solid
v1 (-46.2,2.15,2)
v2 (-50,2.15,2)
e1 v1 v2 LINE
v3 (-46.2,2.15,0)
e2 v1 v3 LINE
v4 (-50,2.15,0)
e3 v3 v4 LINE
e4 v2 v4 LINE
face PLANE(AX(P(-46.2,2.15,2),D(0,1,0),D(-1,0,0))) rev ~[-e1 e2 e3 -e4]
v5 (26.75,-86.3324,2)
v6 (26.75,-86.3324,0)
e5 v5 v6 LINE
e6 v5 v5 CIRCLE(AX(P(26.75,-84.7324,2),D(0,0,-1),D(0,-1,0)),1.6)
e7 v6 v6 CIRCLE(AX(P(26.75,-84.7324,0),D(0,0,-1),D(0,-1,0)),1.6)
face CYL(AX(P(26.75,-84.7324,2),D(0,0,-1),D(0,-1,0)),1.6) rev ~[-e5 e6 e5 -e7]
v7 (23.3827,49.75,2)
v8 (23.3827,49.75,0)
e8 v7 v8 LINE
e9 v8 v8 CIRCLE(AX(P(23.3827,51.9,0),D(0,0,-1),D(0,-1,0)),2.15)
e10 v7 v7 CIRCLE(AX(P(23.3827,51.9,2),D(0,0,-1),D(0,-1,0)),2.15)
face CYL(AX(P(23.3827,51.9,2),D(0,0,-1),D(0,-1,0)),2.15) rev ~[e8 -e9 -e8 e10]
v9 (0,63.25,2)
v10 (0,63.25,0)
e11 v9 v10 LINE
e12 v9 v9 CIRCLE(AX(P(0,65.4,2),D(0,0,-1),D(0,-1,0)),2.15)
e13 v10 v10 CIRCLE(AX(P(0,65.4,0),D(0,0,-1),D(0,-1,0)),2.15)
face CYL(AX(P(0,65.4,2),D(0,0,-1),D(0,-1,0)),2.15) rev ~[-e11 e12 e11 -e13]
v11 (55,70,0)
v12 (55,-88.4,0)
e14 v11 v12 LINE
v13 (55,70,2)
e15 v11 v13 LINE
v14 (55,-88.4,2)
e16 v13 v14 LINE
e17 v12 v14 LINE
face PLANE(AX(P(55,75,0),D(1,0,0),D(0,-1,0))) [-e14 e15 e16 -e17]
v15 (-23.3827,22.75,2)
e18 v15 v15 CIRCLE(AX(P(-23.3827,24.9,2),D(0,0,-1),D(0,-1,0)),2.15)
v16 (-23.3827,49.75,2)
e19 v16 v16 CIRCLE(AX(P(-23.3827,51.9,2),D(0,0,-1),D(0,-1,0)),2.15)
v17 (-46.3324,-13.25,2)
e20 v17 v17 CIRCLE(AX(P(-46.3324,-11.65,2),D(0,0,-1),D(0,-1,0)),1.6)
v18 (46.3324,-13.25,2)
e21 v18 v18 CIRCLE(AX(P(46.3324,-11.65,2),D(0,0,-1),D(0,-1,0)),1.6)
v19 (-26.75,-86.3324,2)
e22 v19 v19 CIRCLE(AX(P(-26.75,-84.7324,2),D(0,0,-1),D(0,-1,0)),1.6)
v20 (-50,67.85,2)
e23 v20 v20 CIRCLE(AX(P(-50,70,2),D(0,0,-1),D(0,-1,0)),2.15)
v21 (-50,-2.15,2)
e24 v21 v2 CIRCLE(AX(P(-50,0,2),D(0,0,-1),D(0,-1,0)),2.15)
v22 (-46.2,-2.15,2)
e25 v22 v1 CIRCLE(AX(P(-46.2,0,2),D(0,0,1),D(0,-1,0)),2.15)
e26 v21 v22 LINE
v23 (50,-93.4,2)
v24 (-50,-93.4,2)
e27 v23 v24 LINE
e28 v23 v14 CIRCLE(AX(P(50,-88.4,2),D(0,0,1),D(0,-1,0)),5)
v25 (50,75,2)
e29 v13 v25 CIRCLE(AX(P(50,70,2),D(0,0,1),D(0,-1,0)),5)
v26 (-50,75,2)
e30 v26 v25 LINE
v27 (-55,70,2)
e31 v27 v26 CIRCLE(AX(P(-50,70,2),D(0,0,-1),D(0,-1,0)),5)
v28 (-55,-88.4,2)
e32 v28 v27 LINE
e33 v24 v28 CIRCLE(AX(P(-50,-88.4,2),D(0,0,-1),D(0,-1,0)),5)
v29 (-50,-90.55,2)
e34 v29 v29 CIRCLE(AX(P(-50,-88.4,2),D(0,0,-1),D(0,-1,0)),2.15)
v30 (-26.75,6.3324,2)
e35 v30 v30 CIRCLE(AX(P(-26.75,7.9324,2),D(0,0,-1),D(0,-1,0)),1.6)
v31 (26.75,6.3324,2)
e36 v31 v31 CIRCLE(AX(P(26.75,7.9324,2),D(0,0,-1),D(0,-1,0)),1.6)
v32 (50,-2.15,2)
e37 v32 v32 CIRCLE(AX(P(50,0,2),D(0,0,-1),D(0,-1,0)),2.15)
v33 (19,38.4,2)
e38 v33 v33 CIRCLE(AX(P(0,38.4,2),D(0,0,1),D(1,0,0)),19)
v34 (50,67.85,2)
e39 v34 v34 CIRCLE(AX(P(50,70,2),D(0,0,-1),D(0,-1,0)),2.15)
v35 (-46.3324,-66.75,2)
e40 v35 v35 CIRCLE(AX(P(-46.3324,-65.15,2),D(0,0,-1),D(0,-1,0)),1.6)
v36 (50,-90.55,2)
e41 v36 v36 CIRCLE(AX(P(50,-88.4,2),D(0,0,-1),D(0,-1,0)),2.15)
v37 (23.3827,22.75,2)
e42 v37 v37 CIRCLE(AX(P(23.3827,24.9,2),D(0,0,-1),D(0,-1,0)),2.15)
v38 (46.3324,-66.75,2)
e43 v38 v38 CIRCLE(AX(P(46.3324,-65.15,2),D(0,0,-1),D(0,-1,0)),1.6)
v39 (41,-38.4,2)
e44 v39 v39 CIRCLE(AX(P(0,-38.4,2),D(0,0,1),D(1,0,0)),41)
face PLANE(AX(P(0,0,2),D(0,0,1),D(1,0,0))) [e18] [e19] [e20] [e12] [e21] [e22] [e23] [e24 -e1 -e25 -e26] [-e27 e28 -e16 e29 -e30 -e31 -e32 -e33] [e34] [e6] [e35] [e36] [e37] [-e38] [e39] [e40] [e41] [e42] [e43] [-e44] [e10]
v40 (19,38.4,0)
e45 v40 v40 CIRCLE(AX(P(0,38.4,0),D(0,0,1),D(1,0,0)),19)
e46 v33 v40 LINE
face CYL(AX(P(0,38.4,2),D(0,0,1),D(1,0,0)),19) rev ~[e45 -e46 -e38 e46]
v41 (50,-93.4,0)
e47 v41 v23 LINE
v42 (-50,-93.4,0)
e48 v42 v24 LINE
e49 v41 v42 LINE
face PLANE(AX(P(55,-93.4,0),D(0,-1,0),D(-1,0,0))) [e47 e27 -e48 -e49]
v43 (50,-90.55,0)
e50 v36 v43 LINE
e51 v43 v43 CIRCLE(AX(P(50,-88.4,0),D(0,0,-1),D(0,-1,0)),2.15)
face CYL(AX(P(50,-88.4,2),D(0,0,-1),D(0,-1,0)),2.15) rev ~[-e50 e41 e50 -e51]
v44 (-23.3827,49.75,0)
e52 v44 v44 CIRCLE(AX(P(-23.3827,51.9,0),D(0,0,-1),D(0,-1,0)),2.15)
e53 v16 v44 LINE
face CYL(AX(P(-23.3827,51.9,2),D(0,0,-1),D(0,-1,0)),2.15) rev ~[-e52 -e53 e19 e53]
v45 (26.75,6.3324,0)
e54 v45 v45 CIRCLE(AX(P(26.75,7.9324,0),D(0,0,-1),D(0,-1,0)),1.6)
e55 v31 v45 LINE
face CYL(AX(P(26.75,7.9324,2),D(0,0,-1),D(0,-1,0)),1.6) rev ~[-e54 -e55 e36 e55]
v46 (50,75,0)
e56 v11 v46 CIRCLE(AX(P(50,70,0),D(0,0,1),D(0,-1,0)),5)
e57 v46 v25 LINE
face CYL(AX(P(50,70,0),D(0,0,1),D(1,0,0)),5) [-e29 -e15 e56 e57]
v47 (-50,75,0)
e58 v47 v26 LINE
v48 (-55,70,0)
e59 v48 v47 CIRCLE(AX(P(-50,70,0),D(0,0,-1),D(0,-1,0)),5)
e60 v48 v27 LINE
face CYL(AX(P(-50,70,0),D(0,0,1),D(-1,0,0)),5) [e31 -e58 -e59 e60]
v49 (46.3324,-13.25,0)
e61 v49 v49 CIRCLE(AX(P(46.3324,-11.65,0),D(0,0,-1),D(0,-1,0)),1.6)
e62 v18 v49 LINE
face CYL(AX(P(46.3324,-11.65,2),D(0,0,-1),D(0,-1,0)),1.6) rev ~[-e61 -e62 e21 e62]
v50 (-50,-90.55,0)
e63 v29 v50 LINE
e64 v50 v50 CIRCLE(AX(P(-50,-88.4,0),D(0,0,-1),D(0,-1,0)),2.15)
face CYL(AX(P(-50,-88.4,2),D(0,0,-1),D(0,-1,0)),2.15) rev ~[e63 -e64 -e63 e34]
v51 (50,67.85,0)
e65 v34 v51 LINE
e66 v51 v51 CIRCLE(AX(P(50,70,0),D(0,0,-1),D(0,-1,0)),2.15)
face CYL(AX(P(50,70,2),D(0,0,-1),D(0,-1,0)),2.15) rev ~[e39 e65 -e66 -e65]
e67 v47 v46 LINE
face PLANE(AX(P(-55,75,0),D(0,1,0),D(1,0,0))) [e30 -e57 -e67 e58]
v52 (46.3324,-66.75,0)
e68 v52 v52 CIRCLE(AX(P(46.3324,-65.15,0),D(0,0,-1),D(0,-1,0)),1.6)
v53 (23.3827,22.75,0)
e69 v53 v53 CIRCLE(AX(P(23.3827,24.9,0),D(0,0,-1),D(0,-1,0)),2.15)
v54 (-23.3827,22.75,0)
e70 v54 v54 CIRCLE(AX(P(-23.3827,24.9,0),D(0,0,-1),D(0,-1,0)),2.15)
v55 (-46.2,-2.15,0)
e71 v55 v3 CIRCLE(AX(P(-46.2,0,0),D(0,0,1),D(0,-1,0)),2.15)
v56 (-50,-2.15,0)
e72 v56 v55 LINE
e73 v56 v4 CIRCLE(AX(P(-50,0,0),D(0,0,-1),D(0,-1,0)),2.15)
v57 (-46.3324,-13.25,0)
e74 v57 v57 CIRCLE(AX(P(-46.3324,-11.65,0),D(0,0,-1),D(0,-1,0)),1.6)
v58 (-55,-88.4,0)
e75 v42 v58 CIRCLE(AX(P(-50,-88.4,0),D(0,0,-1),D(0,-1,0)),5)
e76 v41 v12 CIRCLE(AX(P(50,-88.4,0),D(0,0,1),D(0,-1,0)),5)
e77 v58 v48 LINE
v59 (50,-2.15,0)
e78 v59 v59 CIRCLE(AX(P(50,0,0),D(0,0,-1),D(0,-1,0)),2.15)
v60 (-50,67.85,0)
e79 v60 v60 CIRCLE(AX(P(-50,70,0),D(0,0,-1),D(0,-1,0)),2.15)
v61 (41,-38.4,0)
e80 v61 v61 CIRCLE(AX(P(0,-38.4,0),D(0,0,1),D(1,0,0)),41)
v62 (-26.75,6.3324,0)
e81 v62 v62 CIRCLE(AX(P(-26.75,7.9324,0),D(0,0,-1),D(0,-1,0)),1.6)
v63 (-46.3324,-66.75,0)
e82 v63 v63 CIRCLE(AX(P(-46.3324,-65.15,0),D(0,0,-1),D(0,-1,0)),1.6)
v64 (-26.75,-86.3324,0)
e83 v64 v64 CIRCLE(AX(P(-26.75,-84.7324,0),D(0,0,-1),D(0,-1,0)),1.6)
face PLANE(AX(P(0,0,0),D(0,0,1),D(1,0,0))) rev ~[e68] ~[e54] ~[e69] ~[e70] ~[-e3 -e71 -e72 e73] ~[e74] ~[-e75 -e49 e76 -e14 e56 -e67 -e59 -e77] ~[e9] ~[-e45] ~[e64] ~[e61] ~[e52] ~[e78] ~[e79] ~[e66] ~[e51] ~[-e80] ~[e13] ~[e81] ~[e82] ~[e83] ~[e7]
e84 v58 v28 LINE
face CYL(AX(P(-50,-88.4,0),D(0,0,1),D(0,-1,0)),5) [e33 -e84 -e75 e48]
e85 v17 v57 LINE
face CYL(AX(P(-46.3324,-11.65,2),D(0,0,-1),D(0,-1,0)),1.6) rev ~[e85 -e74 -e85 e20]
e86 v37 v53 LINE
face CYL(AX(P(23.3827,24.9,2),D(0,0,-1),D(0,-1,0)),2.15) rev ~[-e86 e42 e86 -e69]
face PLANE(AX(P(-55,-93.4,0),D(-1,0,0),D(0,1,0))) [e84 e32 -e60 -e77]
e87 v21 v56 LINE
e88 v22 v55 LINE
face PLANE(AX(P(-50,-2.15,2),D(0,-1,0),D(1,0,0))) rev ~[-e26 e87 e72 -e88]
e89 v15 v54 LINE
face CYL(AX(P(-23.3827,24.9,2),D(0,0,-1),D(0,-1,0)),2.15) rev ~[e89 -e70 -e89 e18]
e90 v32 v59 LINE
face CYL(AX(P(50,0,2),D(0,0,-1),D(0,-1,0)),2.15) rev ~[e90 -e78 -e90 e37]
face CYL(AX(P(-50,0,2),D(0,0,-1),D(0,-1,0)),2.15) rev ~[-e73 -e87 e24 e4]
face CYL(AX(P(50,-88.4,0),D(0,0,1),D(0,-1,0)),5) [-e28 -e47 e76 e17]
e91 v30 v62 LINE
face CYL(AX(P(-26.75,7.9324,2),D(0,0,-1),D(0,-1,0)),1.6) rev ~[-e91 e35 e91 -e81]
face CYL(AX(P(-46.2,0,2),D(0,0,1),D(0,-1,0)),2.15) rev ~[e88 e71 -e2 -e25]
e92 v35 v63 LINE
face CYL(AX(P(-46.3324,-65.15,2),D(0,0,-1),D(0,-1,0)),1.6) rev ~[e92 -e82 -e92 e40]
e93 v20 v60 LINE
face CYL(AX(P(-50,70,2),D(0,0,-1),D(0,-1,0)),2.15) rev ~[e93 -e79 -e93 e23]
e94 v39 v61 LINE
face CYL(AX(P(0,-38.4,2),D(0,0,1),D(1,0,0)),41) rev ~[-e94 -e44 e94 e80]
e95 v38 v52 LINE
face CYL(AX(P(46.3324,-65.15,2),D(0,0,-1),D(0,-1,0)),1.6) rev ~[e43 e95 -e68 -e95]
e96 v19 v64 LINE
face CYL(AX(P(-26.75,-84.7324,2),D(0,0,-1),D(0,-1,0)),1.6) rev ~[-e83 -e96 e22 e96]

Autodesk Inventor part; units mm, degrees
ref_plane "YZ Plane" through (0, 0, 0) normal (1, 0, 0) x (0, 1, 0)
ref_plane "XZ Plane" through (0, 0, 0) normal (0, 1, 0) x (-1, 0, 0)
ref_plane "XY Plane" through (0, 0, 0) normal (0, 0, 1) x (1, 0, 0)
sketch "スケッチ1" plane through (0, 0, 0) normal (0, 0, 1) x (1, 0, 0)
  line L0 (55, -93.4) -> (-55, -93.4)
  line L1 (-55, -93.4) -> (-55, 75)
  line L2 (-55, 75) -> (55, 75)
  line L3 (55, 75) -> (55, -93.4)
  line L4 (55, -93.4) -> (-55, 75) construction
  line L5 (-55, -93.4) -> (55, 75) construction
  point P0 (0, 0)
  point P1 (0, -9.2)
  point P2 (0, -9.2)
  dimension "d50" = 93.4
  dimension "d51" = 110
  dimension "d52" = 75
extrude "プレート1" add sketch "スケッチ1" along normal blind 2
sketch "スケッチ3" plane through (0, 0, 2) normal (0, 0, 1) x (1, 0, 0)
  circle A0 centre (0, 38.4) radius 19
  circle A1 centre (0, -38.4) radius 10
  point P0 (0, 0)
  dimension "d22" = 38
  dimension "d53" = 20
  dimension "d55" = 76.8
  dimension "d56" = 38.4
extrude "押し出し1" cut sketch "スケッチ3" against normal blind 10 contours A0
sketch "スケッチ2" plane through (0, 0, 2) normal (0, 0, 1) x (1, 0, 0)
  circle A0 centre (0, 38.4) radius 15 construction
  circle A1 centre (0, -38.4) radius 53.5
  point P0 (0, 0)
  point P1 (0, 53.4)
  point P2 (-15, 38.4)
  point P3 (0, 23.4)
  point P4 (15, 38.4)
  point P5 (-46.3324, -11.65)
  point P6 (-53.5, -38.4)
  point P7 (-46.3324, -65.15)
  point P8 (-26.75, -84.7324)
  point P9 (0, -91.9)
  point P10 (26.75, -84.7324)
  point P11 (46.3324, -65.15)
  point P12 (53.5, -38.4)
  point P13 (46.3324, -11.65)
  point P14 (26.75, 7.9324)
  point P15 (0, 15.1)
  point P16 (-26.75, 7.9324)
  dimension "d3" = 30
  dimension "d8" = 107
  dimension "d6" = 360
  dimension "d11" = 360
  dimension "d13" = 76.8
  dimension "d14" = 38.4
  dimension "d58" = 0
hole "穴1" at (-26.75, -84.7324, 2) at (-46.3324, -65.15, 2) at (-26.75, 7.9324, 2) at (-46.3324, -11.65, 2) at (26.75, 7.9324, 2) at (46.3324, -11.65, 2) at (46.3324, -65.15, 2) at (26.75, -84.7324, 2) direction (0, 0, -1) diameter 3.2 end through all clearance for "Socket Head Cap Screw" size "M3" standard "Ansi Metric M Profile"
sketch "スケッチ4" plane through (0, 0, 2) normal (0, 0, 1) x (1, 0, 0)
  line L0 (55, -93.4) -> (-55, -93.4) projected
  line L1 (-55, -93.4) -> (-55, 75) projected
  line L2 (55, 75) -> (55, -93.4) projected
  line L3 (-55, 75) -> (55, 75) projected
  line L4 (-50, 70) -> (-50, -88.4)
  line L5 (-50, -88.4) -> (50, -88.4)
  line L6 (50, -88.4) -> (50, 70)
  line L7 (50, 70) -> (-50, 70)
  point P0 (-50, 0)
  point P1 (50, 0)
  point P2 (0, 0)
  dimension "d57" = 5
hole "穴2" at (-50, -88.4, 2) at (50, -88.4, 2) at (50, 70, 2) at (-50, 70, 2) at (-50, 0, 2) at (50, 0, 2) direction (0, 0, -1) diameter 4.3 end through all clearance for "Socket Head Cap Screw" size "M4" standard "Ansi Metric M Profile"
fillet "コーナーR1" radius 5 4 edges at (-55, -93.4, 1) (55, -93.4, 1) (55, 75, 1) (-55, 75, 1)
sketch "スケッチ5" plane through (0, 0, 2) normal (0, 0, 1) x (1, 0, 0)
  circle A0 centre (0, -38.4) radius 41
  point P0 (0, 0)
  dimension "d35" = 82
extrude "押し出し2" cut sketch "スケッチ5" against normal blind 10
sketch "スケッチ6" plane through (0, 0, 2) normal (0, 0, 1) x (1, 0, 0)
  circle A0 centre (0, 38.4) radius 19 projected
  circle A1 centre (0, 38.4) radius 27
  point P0 (0, 0)
  point P1 (-23.3827, 51.9)
  point P2 (-23.3827, 24.9)
  point P3 (0, 11.4)
  point P4 (23.3827, 24.9)
  point P5 (23.3827, 51.9)
  point P6 (0, 65.4)
  dimension "d38" = 54
  dimension "d41" = 360
  dimension "d59" = 0
hole "穴3" at (0, 65.4, 2) at (23.3827, 51.9, 2) at (23.3827, 24.9, 2) at (-23.3827, 24.9, 2) at (-23.3827, 51.9, 2) direction (0, 0, -1) diameter 4.3 end through all clearance for "Socket Head Cap Screw" size "M4" standard "Ansi Metric M Profile"
sketch "スケッチ7" plane through (0, 0, 2) normal (0, 0, 1) x (1, 0, 0)
  circle A0 centre (-50, 0) radius 2.15 projected
  line L0 (-46.2, 0) -> (-50, 0) construction
  line L1 (-46.2, 2.15) -> (-50, 2.15)
  line L2 (-50, -2.15) -> (-46.2, -2.15)
  arc A1 (-46.2, -2.15) -> (-46.2, 2.15) centre (-46.2, 0) ccw
  arc A2 (-50, 2.15) -> (-50, -2.15) centre (-50, 0) ccw
  point P0 (0, 0)
  point P1 (-48.1, 0)
  dimension "d60" = 48.1
extrude "押し出し3" cut sketch "スケッチ7" against normal through all
equation "\"d56\" = 0.5 * d55"
equation "\"d14\" = 0.5 * d13"
equation "\"d20\" = Thickness"
equation "\"d2\" = Thickness"
equation "\"BendRadius\" = Thickness"
equation "\"BendReliefWidth\" = Thickness"
equation "\"BendReliefDepth\" = 0.5 * Thickness"
equation "\"CornerReliefSize\" = 4 * Thickness"
equation "\"MinimumRemnant\" = 2 * Thickness"
equation "\"TransitionRadius\" = BendRadius"
equation "\"JacobiRadiusSize\" = BendRadius"
equation "\"GapSize\" = Thickness"
equation "\"Thickness\" = 2"
properties part number "carbonplate3" material "CFRP"
